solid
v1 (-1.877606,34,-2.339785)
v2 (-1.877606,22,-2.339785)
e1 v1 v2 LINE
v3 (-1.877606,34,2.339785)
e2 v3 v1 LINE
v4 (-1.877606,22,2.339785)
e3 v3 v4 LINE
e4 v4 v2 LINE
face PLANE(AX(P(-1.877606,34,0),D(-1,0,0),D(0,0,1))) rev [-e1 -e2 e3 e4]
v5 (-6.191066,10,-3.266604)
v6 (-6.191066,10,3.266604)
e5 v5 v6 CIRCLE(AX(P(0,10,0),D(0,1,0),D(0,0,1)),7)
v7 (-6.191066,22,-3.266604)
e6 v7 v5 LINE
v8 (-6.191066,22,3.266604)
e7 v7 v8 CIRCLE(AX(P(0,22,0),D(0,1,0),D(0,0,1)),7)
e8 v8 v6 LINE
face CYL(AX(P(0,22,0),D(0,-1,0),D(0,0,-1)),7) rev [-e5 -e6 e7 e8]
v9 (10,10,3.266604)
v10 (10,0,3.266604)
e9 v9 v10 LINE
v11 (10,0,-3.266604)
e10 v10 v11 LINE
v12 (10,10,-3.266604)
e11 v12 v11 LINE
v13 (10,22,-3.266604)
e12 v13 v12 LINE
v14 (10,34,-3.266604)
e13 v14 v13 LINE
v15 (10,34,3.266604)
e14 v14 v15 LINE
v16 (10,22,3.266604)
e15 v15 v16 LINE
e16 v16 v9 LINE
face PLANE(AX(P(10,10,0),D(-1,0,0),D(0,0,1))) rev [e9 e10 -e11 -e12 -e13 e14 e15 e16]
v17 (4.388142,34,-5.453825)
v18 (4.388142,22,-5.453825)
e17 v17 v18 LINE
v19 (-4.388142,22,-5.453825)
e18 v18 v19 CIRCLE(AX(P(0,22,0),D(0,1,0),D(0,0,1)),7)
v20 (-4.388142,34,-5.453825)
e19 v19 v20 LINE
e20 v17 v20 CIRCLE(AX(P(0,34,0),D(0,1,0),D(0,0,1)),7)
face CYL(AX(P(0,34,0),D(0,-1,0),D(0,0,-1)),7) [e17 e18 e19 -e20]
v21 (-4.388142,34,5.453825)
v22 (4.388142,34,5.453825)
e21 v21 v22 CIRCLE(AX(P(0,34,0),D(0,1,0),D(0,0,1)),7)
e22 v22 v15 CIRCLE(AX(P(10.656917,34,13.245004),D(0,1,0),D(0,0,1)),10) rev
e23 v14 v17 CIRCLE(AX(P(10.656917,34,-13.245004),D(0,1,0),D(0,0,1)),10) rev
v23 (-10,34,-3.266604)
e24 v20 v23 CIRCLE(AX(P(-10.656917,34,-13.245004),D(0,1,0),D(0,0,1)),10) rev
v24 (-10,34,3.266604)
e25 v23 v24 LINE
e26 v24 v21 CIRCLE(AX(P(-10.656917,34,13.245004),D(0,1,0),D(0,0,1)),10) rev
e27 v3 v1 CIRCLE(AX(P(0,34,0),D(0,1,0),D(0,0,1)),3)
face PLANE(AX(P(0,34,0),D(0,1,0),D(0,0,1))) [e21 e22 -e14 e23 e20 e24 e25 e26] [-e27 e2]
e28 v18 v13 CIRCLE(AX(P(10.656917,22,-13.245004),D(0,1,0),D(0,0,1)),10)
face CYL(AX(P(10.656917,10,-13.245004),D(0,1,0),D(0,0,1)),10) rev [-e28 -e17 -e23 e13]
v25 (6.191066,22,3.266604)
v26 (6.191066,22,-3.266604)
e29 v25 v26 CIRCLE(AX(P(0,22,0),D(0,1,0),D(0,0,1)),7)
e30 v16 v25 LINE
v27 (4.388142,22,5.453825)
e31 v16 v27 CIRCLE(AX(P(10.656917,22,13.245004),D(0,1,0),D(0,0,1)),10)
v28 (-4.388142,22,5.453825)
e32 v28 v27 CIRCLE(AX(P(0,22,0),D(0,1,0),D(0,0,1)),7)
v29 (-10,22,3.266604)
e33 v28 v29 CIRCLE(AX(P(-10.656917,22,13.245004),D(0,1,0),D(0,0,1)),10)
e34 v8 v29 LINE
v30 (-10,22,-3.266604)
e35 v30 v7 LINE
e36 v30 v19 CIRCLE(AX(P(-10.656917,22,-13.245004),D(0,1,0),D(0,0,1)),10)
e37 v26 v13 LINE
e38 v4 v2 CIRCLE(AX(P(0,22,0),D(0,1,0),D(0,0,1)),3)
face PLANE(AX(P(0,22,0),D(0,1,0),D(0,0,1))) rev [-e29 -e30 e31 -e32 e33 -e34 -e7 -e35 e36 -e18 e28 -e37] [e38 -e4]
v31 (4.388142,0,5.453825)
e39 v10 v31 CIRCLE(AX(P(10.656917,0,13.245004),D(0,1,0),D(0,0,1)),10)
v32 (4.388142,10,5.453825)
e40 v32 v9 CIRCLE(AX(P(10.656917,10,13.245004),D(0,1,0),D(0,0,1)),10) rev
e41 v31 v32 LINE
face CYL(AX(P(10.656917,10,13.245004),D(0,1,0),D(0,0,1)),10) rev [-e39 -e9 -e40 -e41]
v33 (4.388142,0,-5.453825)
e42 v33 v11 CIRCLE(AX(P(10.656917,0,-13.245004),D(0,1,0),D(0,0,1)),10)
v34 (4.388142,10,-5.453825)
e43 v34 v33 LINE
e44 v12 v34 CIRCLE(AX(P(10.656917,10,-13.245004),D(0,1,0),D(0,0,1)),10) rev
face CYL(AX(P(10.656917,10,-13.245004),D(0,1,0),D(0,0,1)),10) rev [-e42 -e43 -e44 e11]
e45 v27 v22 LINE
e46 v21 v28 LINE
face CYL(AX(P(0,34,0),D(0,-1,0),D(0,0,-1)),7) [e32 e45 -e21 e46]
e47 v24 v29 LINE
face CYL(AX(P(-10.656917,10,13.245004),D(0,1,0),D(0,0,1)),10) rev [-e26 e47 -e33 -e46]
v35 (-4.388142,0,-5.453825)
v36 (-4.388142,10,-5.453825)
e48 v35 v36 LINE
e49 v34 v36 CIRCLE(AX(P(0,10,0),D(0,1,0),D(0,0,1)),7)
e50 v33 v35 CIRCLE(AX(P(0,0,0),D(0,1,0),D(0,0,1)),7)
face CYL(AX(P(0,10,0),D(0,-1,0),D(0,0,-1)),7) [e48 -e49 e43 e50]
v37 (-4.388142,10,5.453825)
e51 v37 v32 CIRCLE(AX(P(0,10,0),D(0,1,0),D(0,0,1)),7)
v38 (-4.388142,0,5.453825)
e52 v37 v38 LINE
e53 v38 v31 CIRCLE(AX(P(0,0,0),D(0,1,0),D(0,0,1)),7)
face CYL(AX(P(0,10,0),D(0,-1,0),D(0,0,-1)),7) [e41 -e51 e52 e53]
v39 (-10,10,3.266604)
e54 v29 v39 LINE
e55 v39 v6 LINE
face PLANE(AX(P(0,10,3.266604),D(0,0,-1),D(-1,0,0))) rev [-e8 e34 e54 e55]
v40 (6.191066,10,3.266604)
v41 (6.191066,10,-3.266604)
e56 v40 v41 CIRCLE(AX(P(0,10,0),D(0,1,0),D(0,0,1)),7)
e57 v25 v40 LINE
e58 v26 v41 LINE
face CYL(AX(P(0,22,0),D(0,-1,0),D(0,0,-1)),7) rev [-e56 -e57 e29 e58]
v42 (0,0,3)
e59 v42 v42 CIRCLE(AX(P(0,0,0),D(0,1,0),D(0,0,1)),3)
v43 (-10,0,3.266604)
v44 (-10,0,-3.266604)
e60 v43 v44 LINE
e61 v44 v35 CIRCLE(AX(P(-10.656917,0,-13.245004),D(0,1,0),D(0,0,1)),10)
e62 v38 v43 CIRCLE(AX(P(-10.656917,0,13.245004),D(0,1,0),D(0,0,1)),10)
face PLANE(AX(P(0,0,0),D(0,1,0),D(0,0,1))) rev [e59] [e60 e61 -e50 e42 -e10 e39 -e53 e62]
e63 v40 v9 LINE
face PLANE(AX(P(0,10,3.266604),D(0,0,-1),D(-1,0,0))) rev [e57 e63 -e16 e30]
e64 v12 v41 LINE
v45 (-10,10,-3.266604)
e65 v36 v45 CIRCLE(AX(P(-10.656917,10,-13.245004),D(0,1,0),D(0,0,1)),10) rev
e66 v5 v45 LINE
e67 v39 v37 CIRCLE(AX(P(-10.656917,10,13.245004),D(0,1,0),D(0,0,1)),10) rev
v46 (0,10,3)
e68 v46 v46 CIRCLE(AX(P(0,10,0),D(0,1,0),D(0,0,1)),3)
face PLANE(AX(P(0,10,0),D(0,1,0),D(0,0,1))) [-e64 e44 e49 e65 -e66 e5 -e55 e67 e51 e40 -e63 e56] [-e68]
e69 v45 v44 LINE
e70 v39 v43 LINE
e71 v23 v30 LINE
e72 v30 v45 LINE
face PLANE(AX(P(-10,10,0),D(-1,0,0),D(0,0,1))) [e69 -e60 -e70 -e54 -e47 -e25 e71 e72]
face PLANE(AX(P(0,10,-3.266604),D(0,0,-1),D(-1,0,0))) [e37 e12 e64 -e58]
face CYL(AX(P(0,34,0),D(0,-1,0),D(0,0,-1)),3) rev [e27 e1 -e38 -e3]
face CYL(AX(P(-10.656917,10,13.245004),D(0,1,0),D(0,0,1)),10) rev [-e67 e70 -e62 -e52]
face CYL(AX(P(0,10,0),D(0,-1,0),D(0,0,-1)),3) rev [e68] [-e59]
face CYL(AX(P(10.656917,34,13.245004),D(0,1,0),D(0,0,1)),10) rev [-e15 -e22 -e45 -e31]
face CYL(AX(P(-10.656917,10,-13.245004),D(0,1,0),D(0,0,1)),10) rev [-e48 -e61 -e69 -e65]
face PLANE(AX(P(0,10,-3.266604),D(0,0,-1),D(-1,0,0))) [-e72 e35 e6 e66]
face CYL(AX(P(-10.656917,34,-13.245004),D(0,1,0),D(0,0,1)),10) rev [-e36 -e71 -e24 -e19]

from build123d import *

# Parameters (mm, degrees)
BOSS_EXTRUDE1_DEPTH = 10
BOSS_EXTRUDE2_START = 10
BOSS_EXTRUDE2_DEPTH = 12
BOSS_EXTRUDE3_START = 22
BOSS_EXTRUDE3_DEPTH = 12
FILLET1_R           = 10


with BuildPart() as part:
    # Sketch1 → Boss-Extrude1 (new body)
    # profile 1 of 5: a face of its own
    with BuildSketch(Plane(origin=(0, 0, 0), x_dir=(1, 0, 0), z_dir=(0, 1, 0))):
        with BuildLine():
            Line((-10, 3.266604118), (-10, -3.266604118))
            Line((-10, -3.266604118), (-6.191065945, -3.266604118))
            ThreePointArc((-6.191065945, -3.266604118), (-7, 0), (-6.191065945, 3.266604118))
            Line((-6.191065945, 3.266604118), (-10, 3.266604118))
        make_face()
    # profile 2 of 5: a face of its own
    with BuildSketch(Plane(origin=(0, 0, 0), x_dir=(1, 0, 0), z_dir=(0, 1, 0))):
        with BuildLine():
            ThreePointArc((6.191065945, 3.266604118), (0, 7), (-6.191065945, 3.266604118))
            Line((-6.191065945, 3.266604118), (6.191065945, 3.266604118))
        make_face()
    # profile 3 of 5: a face of its own
    with BuildSketch(Plane(origin=(0, 0, 0), x_dir=(1, 0, 0), z_dir=(0, 1, 0))):
        with BuildLine():
            ThreePointArc((-6.191065945, 3.266604118), (-7, 0), (-6.191065945, -3.266604118))
            Line((-6.191065945, -3.266604118), (6.191065945, -3.266604118))
            ThreePointArc((6.191065945, -3.266604118), (6.794757597, -1.68263757), (7, 0))
            ThreePointArc((7, 0), (6.794757597, 1.68263757), (6.191065945, 3.266604118))
            Line((6.191065945, 3.266604118), (-6.191065945, 3.266604118))
        make_face()
        with BuildLine():
            ThreePointArc((-1.877606485, -2.339785009), (-3, 0), (-1.877606485, 2.339785009))
            ThreePointArc((-1.877606485, 2.339785009), (1.297532378, 2.704886269), (3, 0))
            ThreePointArc((3, 0), (1.297532378, -2.704886269), (-1.877606485, -2.339785009))
        make_face(mode=Mode.SUBTRACT)
    # profile 4 of 5: a face of its own
    with BuildSketch(Plane(origin=(0, 0, 0), x_dir=(1, 0, 0), z_dir=(0, 1, 0))):
        with BuildLine():
            Line((6.191065945, -3.266604118), (-6.191065945, -3.266604118))
            ThreePointArc((-6.191065945, -3.266604118), (0, -7), (6.191065945, -3.266604118))
        make_face()
    # profile 5 of 5: a face of its own
    with BuildSketch(Plane(origin=(0, 0, 0), x_dir=(1, 0, 0), z_dir=(0, 1, 0))):
        with BuildLine():
            ThreePointArc((7, 0), (6.794757597, -1.68263757), (6.191065945, -3.266604118))
            Line((6.191065945, -3.266604118), (10, -3.266604118))
            Line((10, -3.266604118), (10, 3.266604118))
            Line((10, 3.266604118), (6.191065945, 3.266604118))
            ThreePointArc((6.191065945, 3.266604118), (6.794757597, 1.68263757), (7, 0))
        make_face()
    extrude(amount=BOSS_EXTRUDE1_DEPTH)

    # Sketch1<3> → Boss-Extrude2 (add)
    with BuildSketch(Plane(origin=(0, 0, 0), x_dir=(1, 0, 0), z_dir=(0, 1, 0)).offset(BOSS_EXTRUDE2_START)):
        with BuildLine():
            ThreePointArc((7, 0), (6.794757597, -1.68263757), (6.191065945, -3.266604118))
            Line((6.191065945, -3.266604118), (10, -3.266604118))
            Line((10, -3.266604118), (10, 3.266604118))
            Line((10, 3.266604118), (6.191065945, 3.266604118))
            ThreePointArc((6.191065945, 3.266604118), (6.794757597, 1.68263757), (7, 0))
        make_face()
        with BuildLine():
            Line((-10, 3.266604118), (-10, -3.266604118))
            Line((-10, -3.266604118), (-6.191065945, -3.266604118))
            ThreePointArc((-6.191065945, -3.266604118), (-7, 0), (-6.191065945, 3.266604118))
            Line((-6.191065945, 3.266604118), (-10, 3.266604118))
        make_face()
    extrude(amount=BOSS_EXTRUDE2_DEPTH)

    # Sketch1<5> → Boss-Extrude3 (add)
    with BuildSketch(Plane(origin=(0, 0, 0), x_dir=(1, 0, 0), z_dir=(0, 1, 0)).offset(BOSS_EXTRUDE3_START)):
        with BuildLine():
            Line((-10, 3.266604118), (-10, -3.266604118))
            Line((-10, -3.266604118), (-6.191065945, -3.266604118))
            ThreePointArc((-6.191065945, -3.266604118), (0, -7), (6.191065945, -3.266604118))
            Line((6.191065945, -3.266604118), (10, -3.266604118))
            Line((10, -3.266604118), (10, 3.266604118))
            Line((10, 3.266604118), (6.191065945, 3.266604118))
            ThreePointArc((6.191065945, 3.266604118), (0, 7), (-6.191065945, 3.266604118))
            Line((-6.191065945, 3.266604118), (-10, 3.266604118))
        make_face()
        with BuildLine():
            Line((-1.877606485, -2.339785009), (-1.877606485, 2.339785009))
            ThreePointArc((-1.877606485, 2.339785009), (3, 0), (-1.877606485, -2.339785009))
        make_face(mode=Mode.SUBTRACT)
    extrude(amount=BOSS_EXTRUDE3_DEPTH)

    # Fillet1
    # the kernel refuses this fillet: 10 mm, written as the material it adds along each edge
    with BuildSketch(Plane(origin=(6.191065945, 0, 3.266604118), x_dir=(-0.6360609802051742, 0, 0.7716387946833887), z_dir=(0, 1, 0))) as fillet1_piece_1:
        with BuildLine():
            CenterArc((4.859166888, 9.792894401), FILLET1_R, 223.265287812, 35.053552735)
            Line((-2.422714329, 2.939121283), (0, 0))
            ThreePointArc((0, 0), (1.417257009, 0.144973919), (2.834514018, 0))
        make_face()
    extrude(amount=10)
    with BuildSketch(Plane(origin=(-6.191065945, 0, 3.266604118), x_dir=(-1, 0, 0), z_dir=(0, 1, 0)), Plane(origin=(6.191065945, 0, -3.266604118), x_dir=(1, 0, 0), z_dir=(0, 1, 0))) as fillet1_piece_2:
        with BuildLine():
            CenterArc((4.465850779, 9.978399692), FILLET1_R, 231.17987933, 35.053552735)
            ThreePointArc((-1.802923765, 2.18722098), (-0.789594382, 1.185822743), (0, 0))
            Line((0, 0), (3.808934055, 0))
        make_face()
    extrude(amount=10)
    with BuildSketch(Plane(origin=(6.191065945, 22, 3.266604118), x_dir=(1, 0, 0), z_dir=(0, 1, 0))) as fillet1_piece_3:
        with BuildLine():
            CenterArc((4.465850779, -9.978399692), FILLET1_R, 93.766567935, 35.053552735)
            ThreePointArc((-1.802923765, -2.18722098), (-0.789594382, -1.185822743), (0, 0))
            Line((0, 0), (3.808934055, 0))
        make_face()
    extrude(amount=12)
    with BuildSketch(Plane(origin=(-6.191065945, 22, 3.266604118), x_dir=(-1, 0, 0), z_dir=(0, 1, 0))) as fillet1_piece_4:
        with BuildLine():
            CenterArc((4.465850779, 9.978399692), FILLET1_R, 231.17987933, 35.053552735)
            ThreePointArc((-1.802923765, 2.18722098), (-0.789594382, 1.185822743), (0, 0))
            Line((0, 0), (3.808934055, 0))
        make_face()
    extrude(amount=12)
    with BuildSketch(Plane(origin=(-6.191065945, 22, -3.266604118), x_dir=(0.6360609802051819, 0, -0.7716387946833824), z_dir=(0, 1, 0))) as fillet1_piece_5:
        with BuildLine():
            CenterArc((4.859166888, 9.792894401), FILLET1_R, 223.265287812, 35.053552735)
            Line((-2.422714329, 2.939121283), (0, 0))
            ThreePointArc((0, 0), (1.417257009, 0.144973919), (2.834514018, 0))
        make_face()
    extrude(amount=12)
    with BuildSketch(Plane(origin=(6.191065945, 22, -3.266604118), x_dir=(-0.6360609802051733, 0, -0.7716387946833895), z_dir=(0, 1, 0))) as fillet1_piece_6:
        with BuildLine():
            CenterArc((4.859166888, -9.792894401), FILLET1_R, 101.681159453, 35.053552735)
            Line((-2.422714329, -2.939121283), (0, 0))
            ThreePointArc((0, 0), (1.417257009, -0.144973919), (2.834514018, 0))
        make_face()
    extrude(amount=12)
    with BuildSketch(Plane(origin=(-6.191065945, 0, -3.266604118), x_dir=(-1, 0, 0), z_dir=(0, 1, 0))) as fillet1_piece_7:
        with BuildLine():
            CenterArc((4.465850779, -9.978399692), FILLET1_R, 93.766567935, 35.053552735)
            ThreePointArc((-1.802923765, -2.18722098), (-0.789594382, -1.185822743), (0, 0))
            Line((0, 0), (3.808934055, 0))
        make_face()
    extrude(amount=10)


solid = part.part
